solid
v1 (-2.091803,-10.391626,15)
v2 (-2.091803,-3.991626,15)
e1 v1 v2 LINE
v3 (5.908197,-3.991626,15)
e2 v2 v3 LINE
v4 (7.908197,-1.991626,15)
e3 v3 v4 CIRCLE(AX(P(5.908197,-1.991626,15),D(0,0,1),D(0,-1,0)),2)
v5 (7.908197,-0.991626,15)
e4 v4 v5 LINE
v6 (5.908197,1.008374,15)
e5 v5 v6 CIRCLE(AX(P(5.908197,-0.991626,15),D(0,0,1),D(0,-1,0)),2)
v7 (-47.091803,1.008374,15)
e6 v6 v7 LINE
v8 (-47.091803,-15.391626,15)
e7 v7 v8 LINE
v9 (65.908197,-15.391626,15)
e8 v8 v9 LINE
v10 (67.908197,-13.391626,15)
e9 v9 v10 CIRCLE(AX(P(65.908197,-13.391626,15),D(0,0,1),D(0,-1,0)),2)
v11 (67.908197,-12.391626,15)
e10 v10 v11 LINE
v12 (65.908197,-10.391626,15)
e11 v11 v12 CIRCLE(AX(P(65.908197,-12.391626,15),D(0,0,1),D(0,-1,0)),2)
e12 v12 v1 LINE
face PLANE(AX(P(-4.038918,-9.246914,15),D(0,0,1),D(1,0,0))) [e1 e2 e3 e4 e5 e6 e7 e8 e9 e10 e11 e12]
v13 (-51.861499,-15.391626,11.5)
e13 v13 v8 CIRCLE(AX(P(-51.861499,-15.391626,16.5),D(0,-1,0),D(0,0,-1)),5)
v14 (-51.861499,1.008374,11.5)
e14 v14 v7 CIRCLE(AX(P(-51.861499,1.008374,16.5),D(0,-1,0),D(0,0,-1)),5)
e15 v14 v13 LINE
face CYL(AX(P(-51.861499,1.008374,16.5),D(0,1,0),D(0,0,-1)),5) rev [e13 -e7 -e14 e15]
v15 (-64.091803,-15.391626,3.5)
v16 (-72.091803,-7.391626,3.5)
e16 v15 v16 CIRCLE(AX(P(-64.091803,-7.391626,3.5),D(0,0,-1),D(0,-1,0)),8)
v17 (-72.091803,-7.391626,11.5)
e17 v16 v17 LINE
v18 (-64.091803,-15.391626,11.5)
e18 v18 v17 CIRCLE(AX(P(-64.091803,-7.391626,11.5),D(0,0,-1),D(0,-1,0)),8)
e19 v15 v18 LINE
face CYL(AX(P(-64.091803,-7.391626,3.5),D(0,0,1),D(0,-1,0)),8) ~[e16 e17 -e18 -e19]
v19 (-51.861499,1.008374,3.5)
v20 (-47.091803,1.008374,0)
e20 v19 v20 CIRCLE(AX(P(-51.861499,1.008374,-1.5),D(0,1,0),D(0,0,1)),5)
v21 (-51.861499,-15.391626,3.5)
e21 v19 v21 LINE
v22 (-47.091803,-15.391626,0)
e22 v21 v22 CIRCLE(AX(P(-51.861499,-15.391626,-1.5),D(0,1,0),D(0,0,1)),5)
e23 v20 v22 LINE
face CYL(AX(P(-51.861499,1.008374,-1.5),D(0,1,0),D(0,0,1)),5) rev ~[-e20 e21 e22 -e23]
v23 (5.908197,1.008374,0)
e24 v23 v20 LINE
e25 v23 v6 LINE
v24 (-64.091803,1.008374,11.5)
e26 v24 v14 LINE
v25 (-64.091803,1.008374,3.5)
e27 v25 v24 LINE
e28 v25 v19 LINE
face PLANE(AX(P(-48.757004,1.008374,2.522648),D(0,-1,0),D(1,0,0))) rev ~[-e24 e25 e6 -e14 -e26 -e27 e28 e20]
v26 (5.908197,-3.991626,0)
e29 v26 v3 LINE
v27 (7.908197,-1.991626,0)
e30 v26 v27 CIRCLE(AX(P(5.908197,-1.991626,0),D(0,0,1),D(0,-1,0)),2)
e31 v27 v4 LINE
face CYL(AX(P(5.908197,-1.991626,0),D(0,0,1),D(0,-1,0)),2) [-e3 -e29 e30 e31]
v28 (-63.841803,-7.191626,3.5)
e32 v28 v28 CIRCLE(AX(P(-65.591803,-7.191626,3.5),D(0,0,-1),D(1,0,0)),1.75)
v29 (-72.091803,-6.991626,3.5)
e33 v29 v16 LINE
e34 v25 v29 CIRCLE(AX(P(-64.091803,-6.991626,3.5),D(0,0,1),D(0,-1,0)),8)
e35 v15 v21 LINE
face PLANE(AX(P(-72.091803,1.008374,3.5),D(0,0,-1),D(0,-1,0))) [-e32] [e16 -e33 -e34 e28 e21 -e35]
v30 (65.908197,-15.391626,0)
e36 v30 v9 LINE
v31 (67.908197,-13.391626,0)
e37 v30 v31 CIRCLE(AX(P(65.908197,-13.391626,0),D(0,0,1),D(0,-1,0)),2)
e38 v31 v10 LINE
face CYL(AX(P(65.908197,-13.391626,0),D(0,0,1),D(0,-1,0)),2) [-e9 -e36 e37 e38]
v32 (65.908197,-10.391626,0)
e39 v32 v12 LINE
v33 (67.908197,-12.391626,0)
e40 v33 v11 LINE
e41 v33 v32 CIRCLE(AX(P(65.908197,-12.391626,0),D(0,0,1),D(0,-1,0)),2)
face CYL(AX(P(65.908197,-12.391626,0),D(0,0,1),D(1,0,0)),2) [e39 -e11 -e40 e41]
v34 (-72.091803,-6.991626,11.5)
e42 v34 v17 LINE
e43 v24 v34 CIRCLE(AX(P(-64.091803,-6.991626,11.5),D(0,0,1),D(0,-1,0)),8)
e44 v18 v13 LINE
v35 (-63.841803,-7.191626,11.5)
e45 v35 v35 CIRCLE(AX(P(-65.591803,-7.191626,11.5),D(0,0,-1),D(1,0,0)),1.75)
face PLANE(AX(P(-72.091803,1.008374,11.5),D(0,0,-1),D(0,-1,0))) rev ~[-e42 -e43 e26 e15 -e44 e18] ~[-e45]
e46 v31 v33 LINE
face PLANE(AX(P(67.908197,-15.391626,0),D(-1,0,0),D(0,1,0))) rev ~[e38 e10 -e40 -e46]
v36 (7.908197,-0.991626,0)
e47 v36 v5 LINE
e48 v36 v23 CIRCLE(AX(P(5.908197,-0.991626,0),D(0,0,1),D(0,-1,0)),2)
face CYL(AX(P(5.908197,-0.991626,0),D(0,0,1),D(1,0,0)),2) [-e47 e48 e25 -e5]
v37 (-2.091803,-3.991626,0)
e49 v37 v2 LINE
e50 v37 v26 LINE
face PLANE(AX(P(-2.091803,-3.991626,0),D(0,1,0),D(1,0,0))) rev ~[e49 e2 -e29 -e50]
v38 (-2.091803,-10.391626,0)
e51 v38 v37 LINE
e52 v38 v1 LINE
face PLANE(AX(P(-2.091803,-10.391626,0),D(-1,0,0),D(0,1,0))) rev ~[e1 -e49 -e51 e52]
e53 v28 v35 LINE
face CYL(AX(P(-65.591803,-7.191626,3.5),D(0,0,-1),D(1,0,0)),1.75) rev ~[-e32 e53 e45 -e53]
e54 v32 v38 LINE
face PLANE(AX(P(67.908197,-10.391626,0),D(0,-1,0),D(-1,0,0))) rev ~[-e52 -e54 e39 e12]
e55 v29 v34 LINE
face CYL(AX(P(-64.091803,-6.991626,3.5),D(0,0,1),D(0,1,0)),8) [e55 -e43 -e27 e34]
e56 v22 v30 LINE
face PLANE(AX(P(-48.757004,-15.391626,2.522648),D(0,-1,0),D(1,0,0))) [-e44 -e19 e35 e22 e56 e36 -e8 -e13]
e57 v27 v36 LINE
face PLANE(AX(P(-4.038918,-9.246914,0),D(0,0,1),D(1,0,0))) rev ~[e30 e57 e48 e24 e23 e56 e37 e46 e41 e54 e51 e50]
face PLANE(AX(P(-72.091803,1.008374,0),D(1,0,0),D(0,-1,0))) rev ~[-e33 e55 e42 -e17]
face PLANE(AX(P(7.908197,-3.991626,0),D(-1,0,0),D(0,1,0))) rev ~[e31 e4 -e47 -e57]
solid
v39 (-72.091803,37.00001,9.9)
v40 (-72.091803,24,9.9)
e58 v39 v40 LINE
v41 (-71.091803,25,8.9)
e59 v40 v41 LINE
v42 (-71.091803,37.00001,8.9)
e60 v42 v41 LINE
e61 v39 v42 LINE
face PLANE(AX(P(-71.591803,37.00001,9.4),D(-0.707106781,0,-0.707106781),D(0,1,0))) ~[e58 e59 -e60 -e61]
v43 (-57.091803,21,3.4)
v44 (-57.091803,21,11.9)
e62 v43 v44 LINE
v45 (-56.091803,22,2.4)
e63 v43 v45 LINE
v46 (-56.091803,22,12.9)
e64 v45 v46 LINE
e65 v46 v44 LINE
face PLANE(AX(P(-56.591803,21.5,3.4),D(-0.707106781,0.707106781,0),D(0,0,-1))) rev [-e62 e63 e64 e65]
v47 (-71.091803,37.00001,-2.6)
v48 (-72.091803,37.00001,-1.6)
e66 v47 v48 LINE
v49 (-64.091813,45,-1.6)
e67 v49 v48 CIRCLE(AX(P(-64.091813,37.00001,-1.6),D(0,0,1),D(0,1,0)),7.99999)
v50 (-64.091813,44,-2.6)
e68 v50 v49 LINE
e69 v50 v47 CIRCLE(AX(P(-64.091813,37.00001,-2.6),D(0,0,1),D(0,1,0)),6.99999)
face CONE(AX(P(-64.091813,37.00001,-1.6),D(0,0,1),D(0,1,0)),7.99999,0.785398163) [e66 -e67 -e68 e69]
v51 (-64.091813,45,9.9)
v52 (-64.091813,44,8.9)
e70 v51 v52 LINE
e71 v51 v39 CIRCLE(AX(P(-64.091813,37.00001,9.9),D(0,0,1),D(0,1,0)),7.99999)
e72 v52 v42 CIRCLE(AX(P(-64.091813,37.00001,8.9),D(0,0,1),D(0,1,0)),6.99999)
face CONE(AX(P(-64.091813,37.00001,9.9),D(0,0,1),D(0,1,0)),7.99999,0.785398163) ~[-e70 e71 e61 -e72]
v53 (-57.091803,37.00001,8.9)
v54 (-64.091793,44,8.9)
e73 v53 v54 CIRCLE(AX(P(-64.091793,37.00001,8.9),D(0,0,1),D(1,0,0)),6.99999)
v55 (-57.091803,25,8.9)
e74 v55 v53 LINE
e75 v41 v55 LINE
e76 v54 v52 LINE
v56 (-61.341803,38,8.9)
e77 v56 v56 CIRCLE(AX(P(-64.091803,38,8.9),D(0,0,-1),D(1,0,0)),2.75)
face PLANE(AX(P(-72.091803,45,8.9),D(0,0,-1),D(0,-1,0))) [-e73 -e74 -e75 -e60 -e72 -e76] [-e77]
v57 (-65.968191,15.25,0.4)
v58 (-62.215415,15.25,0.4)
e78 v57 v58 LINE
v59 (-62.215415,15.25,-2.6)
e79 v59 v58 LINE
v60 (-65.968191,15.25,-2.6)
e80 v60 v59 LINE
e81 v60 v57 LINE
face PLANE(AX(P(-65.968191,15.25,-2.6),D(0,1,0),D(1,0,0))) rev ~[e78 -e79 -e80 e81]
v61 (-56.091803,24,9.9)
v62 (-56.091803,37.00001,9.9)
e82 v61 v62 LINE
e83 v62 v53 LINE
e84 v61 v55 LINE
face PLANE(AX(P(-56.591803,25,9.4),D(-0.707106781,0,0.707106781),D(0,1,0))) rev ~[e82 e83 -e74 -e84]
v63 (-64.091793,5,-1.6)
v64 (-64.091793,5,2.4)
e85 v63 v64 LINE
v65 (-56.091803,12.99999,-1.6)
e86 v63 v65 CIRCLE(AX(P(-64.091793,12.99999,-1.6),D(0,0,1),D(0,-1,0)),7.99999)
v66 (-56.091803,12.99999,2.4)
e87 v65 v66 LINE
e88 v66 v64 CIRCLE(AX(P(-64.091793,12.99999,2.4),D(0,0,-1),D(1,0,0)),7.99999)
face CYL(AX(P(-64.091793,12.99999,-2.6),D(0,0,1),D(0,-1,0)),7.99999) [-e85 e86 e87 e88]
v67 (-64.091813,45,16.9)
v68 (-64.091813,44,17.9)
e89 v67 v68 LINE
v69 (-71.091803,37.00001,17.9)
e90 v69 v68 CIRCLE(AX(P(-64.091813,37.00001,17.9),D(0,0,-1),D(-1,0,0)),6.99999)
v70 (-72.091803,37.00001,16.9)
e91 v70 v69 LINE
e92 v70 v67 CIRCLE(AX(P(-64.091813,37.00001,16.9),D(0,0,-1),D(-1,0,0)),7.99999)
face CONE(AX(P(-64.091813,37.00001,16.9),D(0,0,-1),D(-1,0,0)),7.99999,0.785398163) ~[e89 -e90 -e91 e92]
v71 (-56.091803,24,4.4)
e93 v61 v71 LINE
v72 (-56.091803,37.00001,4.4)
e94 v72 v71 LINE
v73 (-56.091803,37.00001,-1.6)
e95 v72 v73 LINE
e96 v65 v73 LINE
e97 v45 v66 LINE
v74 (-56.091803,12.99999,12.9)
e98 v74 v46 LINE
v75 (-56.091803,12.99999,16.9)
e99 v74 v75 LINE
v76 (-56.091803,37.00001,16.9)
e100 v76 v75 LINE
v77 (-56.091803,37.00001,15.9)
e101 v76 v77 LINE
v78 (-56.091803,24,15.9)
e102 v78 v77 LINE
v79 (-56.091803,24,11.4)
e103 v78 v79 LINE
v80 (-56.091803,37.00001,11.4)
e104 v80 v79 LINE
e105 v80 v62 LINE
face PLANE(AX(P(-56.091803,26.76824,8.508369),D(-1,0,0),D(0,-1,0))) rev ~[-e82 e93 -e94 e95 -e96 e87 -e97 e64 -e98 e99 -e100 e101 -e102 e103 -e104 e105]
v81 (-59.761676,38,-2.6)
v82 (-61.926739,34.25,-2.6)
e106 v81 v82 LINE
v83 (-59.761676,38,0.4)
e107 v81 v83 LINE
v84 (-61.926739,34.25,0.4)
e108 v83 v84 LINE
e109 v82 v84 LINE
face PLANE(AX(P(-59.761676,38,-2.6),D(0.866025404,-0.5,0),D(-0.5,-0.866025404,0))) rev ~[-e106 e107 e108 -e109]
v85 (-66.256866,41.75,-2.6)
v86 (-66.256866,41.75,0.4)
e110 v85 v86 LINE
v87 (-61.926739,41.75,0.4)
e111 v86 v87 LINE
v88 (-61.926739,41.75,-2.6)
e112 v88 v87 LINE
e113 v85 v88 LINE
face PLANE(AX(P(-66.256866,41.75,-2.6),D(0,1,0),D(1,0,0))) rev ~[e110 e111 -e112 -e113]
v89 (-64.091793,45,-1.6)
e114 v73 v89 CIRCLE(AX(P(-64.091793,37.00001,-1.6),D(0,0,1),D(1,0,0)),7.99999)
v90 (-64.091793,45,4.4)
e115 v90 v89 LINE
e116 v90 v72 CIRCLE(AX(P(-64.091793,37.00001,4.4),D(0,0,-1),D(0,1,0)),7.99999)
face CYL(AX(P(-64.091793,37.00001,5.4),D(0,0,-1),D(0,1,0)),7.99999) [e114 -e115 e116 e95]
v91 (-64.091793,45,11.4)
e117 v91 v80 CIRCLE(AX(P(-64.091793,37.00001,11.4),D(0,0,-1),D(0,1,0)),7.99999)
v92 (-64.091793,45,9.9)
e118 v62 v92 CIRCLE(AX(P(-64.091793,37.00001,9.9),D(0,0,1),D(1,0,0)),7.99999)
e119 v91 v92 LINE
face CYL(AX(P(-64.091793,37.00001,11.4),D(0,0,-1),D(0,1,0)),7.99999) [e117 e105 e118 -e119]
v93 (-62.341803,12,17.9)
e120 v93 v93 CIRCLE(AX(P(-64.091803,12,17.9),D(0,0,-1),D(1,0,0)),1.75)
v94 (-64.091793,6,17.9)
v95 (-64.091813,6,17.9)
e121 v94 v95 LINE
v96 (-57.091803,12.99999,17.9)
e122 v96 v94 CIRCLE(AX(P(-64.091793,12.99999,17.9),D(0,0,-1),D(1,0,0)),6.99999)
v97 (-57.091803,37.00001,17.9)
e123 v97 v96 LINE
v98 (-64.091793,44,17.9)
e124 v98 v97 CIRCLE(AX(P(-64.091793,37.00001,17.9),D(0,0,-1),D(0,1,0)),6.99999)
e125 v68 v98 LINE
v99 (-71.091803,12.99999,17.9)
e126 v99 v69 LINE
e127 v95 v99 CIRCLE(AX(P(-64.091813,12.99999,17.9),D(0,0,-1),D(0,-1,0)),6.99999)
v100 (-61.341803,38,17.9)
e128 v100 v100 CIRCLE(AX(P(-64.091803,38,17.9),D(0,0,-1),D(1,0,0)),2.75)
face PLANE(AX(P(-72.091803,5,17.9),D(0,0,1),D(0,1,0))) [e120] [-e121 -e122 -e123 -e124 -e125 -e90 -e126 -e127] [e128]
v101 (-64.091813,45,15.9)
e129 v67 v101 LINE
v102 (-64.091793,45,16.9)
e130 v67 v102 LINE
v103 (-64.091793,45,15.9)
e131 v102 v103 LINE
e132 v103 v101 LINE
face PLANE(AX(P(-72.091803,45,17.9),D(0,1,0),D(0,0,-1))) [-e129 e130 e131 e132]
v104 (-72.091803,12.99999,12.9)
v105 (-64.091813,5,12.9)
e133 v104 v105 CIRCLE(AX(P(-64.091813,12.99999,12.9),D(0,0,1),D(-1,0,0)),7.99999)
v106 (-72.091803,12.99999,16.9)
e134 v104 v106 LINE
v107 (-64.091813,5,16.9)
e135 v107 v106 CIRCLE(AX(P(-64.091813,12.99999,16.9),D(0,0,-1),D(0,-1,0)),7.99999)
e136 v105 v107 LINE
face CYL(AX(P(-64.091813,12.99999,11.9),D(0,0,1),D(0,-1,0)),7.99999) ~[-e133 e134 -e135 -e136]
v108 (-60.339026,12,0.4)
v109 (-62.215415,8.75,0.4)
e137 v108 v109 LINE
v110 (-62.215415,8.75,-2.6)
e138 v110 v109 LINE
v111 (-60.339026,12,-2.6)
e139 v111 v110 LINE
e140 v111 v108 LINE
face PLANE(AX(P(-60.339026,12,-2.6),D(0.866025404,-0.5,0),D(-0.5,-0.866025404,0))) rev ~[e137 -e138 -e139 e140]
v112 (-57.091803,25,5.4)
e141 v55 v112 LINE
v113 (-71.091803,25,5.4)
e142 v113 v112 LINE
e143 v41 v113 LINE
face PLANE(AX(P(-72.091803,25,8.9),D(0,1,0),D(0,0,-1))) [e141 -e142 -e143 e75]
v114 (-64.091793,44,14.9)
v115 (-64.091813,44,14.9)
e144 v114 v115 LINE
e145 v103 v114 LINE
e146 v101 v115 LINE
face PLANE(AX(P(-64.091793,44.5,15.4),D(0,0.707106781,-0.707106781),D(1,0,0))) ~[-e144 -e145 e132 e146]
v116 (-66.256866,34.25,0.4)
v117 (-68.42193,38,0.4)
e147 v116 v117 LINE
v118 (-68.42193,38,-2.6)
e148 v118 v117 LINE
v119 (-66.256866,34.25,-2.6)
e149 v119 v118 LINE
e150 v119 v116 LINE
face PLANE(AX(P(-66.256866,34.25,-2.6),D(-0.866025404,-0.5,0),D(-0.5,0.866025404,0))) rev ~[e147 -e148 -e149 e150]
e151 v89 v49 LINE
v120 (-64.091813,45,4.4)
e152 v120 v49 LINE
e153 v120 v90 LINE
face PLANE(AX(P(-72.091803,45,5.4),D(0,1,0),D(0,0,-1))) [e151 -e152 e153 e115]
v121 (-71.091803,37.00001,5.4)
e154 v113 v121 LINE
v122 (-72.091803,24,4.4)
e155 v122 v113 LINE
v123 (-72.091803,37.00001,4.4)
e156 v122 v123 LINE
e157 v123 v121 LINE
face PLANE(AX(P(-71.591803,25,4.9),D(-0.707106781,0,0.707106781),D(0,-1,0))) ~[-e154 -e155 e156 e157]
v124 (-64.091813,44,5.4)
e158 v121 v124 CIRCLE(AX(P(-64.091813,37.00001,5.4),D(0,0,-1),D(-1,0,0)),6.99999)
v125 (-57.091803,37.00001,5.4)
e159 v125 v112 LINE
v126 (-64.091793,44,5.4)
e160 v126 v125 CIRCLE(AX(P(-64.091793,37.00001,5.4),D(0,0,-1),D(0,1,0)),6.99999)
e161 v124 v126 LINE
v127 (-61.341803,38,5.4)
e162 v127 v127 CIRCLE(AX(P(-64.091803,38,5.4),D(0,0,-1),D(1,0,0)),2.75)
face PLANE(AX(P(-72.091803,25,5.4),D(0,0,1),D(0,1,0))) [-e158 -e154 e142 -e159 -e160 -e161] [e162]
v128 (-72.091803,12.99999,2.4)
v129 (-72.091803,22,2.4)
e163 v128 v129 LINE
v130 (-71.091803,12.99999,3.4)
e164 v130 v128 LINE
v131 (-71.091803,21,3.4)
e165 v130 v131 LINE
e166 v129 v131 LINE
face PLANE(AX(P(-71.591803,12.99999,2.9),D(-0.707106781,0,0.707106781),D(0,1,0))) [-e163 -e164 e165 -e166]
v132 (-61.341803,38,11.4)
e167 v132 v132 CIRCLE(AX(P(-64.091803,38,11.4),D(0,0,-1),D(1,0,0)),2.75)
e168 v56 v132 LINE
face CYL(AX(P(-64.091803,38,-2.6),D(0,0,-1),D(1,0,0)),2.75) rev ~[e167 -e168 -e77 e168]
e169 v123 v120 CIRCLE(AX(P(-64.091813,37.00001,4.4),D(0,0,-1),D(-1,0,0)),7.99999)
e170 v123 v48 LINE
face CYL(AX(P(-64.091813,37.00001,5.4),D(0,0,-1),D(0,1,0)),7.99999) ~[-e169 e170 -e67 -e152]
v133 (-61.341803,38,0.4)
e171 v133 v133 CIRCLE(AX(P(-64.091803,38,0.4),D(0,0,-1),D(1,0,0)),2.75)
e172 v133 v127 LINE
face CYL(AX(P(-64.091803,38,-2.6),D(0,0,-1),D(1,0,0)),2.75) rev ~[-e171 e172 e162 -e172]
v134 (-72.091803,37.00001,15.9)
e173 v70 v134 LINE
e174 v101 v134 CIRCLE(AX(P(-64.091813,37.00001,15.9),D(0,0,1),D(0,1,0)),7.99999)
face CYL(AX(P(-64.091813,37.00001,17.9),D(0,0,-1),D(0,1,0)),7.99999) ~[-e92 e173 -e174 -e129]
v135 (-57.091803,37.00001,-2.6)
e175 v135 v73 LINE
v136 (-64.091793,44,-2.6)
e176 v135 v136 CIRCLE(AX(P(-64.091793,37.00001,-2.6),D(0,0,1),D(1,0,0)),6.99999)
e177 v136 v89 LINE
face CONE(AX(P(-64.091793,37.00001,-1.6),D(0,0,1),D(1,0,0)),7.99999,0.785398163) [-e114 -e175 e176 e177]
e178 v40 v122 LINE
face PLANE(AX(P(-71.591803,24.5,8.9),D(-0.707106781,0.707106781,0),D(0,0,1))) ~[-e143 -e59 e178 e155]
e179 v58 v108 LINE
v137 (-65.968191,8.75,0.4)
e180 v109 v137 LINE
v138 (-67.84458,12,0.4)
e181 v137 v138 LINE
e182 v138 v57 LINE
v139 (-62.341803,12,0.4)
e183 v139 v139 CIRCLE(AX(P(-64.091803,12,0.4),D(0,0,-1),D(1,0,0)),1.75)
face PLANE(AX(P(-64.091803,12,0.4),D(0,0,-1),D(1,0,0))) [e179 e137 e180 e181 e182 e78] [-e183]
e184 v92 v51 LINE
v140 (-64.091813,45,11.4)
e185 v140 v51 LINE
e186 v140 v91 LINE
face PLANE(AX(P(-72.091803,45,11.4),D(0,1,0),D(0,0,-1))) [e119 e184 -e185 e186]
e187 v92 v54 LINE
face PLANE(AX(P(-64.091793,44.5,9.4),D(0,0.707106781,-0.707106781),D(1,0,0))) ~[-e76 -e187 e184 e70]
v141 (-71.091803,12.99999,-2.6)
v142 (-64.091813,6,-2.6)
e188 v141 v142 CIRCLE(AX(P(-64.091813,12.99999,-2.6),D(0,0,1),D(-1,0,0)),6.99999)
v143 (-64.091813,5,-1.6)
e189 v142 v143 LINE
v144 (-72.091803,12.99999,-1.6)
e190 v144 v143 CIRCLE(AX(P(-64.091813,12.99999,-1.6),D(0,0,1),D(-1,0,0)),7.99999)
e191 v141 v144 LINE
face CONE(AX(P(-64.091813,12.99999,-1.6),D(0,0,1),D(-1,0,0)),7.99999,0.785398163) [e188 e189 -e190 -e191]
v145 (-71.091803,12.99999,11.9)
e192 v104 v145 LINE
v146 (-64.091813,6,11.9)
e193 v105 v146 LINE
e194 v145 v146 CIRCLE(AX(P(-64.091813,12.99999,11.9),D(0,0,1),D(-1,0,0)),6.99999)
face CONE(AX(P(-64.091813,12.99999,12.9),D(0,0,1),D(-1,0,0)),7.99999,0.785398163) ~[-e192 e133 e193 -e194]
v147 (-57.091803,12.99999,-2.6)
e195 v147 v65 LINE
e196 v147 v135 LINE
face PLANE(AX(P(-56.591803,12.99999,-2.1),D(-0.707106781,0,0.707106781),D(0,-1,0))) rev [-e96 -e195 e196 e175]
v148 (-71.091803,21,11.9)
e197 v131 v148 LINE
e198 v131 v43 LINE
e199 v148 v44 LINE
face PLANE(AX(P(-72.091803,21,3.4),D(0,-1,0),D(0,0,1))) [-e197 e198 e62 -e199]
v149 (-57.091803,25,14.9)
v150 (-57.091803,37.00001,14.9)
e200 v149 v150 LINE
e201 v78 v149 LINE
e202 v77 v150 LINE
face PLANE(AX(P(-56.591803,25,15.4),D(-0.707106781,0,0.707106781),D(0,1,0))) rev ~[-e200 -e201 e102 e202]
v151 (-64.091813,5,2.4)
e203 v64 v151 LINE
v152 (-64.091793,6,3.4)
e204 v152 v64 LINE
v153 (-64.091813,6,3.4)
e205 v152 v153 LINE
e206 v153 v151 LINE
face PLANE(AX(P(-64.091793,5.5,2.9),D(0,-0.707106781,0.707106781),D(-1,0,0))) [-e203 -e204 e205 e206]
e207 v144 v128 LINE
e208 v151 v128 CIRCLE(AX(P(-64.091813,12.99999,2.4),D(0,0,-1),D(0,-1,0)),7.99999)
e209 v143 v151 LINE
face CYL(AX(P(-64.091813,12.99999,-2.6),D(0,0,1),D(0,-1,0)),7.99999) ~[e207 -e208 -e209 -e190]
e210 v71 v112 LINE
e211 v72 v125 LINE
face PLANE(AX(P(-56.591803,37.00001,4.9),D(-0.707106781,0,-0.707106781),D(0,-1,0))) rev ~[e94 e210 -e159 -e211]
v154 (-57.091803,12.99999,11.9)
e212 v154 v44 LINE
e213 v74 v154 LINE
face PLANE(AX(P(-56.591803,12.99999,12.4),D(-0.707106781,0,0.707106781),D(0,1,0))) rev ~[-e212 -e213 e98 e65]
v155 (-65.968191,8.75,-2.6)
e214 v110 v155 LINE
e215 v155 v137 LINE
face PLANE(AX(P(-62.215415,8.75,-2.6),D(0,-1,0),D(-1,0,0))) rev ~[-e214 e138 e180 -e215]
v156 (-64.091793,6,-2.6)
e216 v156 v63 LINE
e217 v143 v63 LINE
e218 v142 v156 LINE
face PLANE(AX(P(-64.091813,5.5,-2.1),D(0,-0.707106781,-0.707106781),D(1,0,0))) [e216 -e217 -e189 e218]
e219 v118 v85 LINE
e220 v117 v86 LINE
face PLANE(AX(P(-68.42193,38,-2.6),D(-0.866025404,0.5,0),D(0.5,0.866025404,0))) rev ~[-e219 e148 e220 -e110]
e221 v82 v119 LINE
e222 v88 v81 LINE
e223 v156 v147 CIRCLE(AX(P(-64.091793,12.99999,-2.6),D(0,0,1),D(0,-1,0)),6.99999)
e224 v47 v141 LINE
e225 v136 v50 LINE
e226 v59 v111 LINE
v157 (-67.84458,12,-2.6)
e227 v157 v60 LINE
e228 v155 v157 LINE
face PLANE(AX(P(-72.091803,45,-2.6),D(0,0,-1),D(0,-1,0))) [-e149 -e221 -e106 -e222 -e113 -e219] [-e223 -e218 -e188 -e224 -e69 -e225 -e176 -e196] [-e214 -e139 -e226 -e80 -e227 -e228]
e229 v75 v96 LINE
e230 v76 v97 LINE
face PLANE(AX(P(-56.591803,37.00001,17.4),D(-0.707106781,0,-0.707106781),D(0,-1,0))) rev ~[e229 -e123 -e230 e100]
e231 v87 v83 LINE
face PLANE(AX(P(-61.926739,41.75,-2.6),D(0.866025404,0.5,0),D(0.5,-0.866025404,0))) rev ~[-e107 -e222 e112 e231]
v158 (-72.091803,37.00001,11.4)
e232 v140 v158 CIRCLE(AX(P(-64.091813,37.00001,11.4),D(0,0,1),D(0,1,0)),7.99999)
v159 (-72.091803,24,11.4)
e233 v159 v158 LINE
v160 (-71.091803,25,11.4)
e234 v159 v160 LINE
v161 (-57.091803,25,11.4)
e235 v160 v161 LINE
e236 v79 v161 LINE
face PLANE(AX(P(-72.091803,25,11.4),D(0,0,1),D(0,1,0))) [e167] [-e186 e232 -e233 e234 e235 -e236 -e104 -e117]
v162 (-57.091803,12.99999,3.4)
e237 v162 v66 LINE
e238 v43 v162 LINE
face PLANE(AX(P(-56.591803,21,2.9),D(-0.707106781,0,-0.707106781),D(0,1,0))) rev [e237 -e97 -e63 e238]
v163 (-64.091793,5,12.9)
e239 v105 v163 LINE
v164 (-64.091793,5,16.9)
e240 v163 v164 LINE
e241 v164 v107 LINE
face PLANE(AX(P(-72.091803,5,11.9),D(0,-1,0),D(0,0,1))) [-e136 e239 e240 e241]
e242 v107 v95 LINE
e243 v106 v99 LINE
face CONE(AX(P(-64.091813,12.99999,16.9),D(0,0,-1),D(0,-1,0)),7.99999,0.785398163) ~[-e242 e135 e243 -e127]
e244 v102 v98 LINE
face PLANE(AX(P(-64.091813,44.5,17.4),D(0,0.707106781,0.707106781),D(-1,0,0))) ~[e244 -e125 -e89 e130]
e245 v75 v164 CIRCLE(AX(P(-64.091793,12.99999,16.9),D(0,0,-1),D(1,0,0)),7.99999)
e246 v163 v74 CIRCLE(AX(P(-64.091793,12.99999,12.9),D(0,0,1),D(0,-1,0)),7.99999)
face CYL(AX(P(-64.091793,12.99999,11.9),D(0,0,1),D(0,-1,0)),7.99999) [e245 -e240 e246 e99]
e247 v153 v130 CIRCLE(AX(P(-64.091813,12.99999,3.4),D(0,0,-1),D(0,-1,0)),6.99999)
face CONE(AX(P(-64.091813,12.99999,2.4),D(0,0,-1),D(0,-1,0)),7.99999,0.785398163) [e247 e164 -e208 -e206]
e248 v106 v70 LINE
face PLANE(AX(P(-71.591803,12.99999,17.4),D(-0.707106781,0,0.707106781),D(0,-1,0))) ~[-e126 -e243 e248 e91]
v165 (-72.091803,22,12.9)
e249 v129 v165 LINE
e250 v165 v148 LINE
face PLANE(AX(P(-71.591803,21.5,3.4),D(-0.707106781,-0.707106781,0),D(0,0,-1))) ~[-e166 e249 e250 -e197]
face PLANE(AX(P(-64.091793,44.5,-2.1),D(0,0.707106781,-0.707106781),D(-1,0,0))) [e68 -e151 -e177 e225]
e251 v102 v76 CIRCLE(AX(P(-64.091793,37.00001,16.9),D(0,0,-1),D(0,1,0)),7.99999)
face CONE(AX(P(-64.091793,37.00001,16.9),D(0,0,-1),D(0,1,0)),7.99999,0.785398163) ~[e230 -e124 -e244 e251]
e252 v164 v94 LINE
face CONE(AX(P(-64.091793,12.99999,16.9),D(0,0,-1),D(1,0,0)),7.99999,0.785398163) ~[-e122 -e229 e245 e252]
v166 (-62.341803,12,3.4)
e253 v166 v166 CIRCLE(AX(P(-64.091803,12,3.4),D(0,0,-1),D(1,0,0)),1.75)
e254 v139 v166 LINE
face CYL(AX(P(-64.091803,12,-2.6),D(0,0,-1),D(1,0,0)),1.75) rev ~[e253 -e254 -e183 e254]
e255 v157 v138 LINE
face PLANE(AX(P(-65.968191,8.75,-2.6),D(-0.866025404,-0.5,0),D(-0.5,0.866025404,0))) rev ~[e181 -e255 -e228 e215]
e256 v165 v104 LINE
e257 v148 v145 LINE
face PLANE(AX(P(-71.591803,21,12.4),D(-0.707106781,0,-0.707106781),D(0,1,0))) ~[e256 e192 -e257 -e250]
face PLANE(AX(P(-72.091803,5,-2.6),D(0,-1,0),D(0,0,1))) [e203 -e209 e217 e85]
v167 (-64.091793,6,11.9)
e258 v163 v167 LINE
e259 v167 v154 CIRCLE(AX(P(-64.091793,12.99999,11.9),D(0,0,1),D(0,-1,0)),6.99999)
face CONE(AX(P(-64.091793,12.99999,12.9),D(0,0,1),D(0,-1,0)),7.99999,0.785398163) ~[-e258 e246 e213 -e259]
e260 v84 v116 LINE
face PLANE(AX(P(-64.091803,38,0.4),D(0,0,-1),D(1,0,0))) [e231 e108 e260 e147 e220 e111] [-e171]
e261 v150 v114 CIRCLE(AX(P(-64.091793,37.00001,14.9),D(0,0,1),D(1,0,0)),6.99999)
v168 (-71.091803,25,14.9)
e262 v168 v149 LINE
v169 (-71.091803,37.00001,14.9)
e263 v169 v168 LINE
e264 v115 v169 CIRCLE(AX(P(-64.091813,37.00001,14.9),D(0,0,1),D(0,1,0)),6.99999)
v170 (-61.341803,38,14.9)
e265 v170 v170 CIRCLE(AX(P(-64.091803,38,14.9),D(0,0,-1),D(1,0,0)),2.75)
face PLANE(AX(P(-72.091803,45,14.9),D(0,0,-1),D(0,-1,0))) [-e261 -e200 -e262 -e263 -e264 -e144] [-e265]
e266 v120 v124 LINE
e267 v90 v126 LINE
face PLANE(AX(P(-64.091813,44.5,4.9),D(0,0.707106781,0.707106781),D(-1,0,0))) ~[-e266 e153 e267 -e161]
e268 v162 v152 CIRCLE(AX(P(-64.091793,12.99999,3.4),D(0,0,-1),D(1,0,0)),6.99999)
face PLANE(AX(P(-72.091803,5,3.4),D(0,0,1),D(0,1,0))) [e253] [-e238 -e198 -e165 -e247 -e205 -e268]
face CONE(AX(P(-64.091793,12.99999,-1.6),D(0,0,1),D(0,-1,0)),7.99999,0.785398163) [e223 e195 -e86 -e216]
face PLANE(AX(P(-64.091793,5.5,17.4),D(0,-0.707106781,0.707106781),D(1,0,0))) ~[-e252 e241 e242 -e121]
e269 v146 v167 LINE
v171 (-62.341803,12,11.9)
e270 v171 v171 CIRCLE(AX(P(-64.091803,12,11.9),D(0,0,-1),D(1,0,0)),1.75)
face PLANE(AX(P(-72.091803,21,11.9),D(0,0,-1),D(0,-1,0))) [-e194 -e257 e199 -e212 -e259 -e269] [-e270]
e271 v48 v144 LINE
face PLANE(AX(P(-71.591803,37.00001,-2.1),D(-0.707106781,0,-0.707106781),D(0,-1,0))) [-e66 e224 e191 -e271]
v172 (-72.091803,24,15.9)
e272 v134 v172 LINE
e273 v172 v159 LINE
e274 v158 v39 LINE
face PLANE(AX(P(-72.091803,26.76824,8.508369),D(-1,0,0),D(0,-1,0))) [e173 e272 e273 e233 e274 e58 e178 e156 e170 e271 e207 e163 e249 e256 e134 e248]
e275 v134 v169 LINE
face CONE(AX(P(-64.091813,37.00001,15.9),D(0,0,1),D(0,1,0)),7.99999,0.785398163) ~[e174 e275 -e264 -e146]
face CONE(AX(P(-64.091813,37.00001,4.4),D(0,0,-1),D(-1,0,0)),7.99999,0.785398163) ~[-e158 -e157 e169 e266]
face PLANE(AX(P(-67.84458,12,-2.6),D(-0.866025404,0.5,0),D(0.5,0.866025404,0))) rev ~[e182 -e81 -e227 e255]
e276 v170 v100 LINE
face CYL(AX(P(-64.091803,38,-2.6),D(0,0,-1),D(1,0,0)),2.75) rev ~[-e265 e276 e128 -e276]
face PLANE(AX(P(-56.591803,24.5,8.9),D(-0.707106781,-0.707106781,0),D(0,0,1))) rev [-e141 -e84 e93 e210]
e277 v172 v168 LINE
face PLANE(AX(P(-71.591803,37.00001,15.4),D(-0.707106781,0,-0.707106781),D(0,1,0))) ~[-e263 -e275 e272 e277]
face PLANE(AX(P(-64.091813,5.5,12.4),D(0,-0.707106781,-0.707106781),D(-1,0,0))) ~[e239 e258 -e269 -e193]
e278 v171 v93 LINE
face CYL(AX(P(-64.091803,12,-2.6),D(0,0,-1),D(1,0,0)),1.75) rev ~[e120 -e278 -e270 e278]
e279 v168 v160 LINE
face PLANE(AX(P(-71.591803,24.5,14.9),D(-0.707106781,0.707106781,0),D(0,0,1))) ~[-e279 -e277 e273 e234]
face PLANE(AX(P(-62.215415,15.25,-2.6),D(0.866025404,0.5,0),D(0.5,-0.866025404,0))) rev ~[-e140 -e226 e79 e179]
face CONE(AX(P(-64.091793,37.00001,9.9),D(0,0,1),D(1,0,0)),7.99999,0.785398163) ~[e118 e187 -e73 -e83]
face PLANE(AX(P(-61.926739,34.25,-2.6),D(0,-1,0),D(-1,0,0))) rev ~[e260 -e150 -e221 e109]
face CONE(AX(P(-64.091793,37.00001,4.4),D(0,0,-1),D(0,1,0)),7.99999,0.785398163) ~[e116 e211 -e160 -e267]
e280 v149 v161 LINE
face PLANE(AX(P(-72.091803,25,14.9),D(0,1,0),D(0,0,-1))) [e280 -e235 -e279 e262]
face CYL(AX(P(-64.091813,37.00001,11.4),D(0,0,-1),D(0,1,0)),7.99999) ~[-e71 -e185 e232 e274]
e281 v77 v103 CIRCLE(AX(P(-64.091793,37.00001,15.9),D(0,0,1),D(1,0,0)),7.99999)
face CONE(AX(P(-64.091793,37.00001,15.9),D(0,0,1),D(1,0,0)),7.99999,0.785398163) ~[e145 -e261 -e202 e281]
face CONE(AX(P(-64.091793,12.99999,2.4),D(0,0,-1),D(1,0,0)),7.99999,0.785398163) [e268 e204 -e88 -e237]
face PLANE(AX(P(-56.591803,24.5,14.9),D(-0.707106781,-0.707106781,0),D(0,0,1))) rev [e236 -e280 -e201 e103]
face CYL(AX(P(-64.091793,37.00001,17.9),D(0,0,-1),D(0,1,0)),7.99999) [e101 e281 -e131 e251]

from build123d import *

# Parameters (mm, degrees)
F1_DEPTH     = 15
F3_DEPTH     = 16
F5_R         = 7.99999
F4_R         = 2.75
F4_R_2       = 1.75
F6_DEPTH     = 25
F9_R         = 2
F10_W        = 16.4
F10_H        = 3.5
F11_DEPTH    = 25
F12_R        = 8
F13_R        = 1.75
F14_DEPTH    = 25
F15_T1_DEPTH = 16.4
F16_R        = 2.75
F16_R_2      = 1.75
F17_DEPTH    = 3
F18_SIZE     = 1


# Not quite as in the source:
# - a fillet or chamfer that OpenCascade refuses, or shapes differently, is made with other operations: its cross-section is extruded or revolved along the edge and cut away or added
# - a fillet or chamfer is up to 0.001 mm smaller than in the source, because OpenCascade refuses the exact size
# - a feature of the source that left no trace in its solid (it failed there, or was rolled back) is left out
# - a feature names something its author has since deleted; it is built from what else it names


with BuildPart() as f1:
    # F0 (on Top) → F1 (new body)
    with BuildSketch(Plane.XY):
        Polygon((-2.0918029547, -10.391625925), (-2.0918029547, -3.991625925), (7.9081970453, -3.991625925), (7.9081970453, 1.008374075), (-2.0918029547, 1.008374075), (-72.0918029547, 1.008374075), (-72.0918029547, -15.391625925), (-2.0918029547, -15.391625925), (67.9081970453, -15.391625925), (67.9081970453, -10.391625925), align=None)
    extrude(amount=F1_DEPTH)

    # F9
    f9_edges = [f1.edges().sort_by_distance(p)[0] for p in [
        (7.908197, 1.008374, 7.5),
        (67.908197, -10.391626, 7.5),
        (67.908197, -15.391626, 7.5),
        (7.908197, -3.991626, 7.5),
    ]]
    fillet(f9_edges, radius=F9_R)

    # F10 (on face) → F11 (cut)
    with BuildSketch(Plane(origin=(-72.0918029547, 0, 0), x_dir=(0, -1, 0), z_dir=(-1, 0, 0))):
        with Locations((7.191625925, 1.75)):
            Rectangle(F10_W, F10_H)
        with Locations((7.191625925, 13.25)):
            Rectangle(F10_W, F10_H)
    extrude(amount=-F11_DEPTH, mode=Mode.SUBTRACT)

    # F12
    f12_edges = [f1.edges().sort_by_distance(p)[0] for p in [
        (-72.091803, 1.008374, 7.5),
        (-72.091803, -15.391626, 7.5),
    ]]
    fillet(f12_edges, radius=F12_R)

    # F13 (on face) → F14 (cut)
    with BuildSketch(Plane(origin=(0, 0, 3.5), x_dir=(1, 0, 0), z_dir=(0, 0, -1))):
        with Locations((-65.5918029547, 7.191625925)):
            Circle(F13_R)
    extrude(amount=-F14_DEPTH, mode=Mode.SUBTRACT)

    # F15: fillet of radius 5 on 2 edges, made by hand

    # F15_s2 → F15_t1 (join)
    with BuildSketch(Plane.XZ.offset(-1.008374075)):
        with BuildLine():
            ThreePointArc((-51.8614989618, 3.5), (-48.9034590702, 2.5311288741), (-47.0918029547, 0))
            Line((-47.0918029547, 0), (-47.0918029547, 3.5))
            Line((-47.0918029547, 3.5), (-51.8614989618, 3.5))
        make_face()
        with BuildLine():
            ThreePointArc((-51.8614989618, 11.5), (-48.9034590702, 12.4688711259), (-47.0918029547, 15))
            Line((-47.0918029547, 15), (-47.0918029547, 11.5))
            Line((-47.0918029547, 11.5), (-51.8614989618, 11.5))
        make_face()
    extrude(amount=F15_T1_DEPTH)


with BuildPart() as f3:
    # F2 (on face) → F3 (new body)
    with BuildSketch(Plane(origin=(-72.0918029547, 0, 0), x_dir=(0, -1, 0), z_dir=(-1, 0, 0))):
        Polygon((-25.0802974196, -2.6), (-5, -2.6), (-5, 3.4), (-21, 3.4), (-21, 11.9), (-5, 11.9), (-5, 17.9), (-25, 17.9), (-45, 17.9), (-45, 14.9), (-25, 14.9), (-25, 11.4), (-45, 11.4), (-45, 8.9), (-25, 8.9), (-25, 5.4), (-45, 5.4), (-45, -2.6), align=None)
    extrude(amount=-F3_DEPTH)

    # F5 (radius 8 in the source; OpenCascade refuses exactly that, so slightly less here)
    f5_edges = [f3.edges().sort_by_distance(p)[0] for p in [
        (-56.091803, 45, 1.4),
        (-56.091803, 45, 10.15),
        (-56.091803, 45, 16.4),
        (-72.091803, 45, 1.4),
        (-72.091803, 45, 10.15),
        (-72.091803, 45, 16.4),
        (-72.091803, 5, 0.4),
        (-72.091803, 5, 14.9),
        (-56.091803, 5, 0.4),
        (-56.091803, 5, 14.9),
    ]]
    fillet(f5_edges, radius=F5_R)

    # F4 (on face) → F6 (cut)
    with BuildSketch(Plane(origin=(0, 0, -2.6), x_dir=(1, 0, 0), z_dir=(0, 0, -1))):
        with Locations((-64.0918029547, -38)):
            Circle(F4_R)
        with Locations((-64.0918029547, -12)):
            Circle(F4_R_2)
    extrude(amount=-F6_DEPTH, mode=Mode.SUBTRACT)

    # F16 (on face) → F17 (cut)
    with BuildSketch(Plane(origin=(0, 0, -2.6), x_dir=(1, 0, 0), z_dir=(0, 0, -1))):
        Polygon((-61.9267394452, -34.25), (-66.2568664641, -34.25), (-68.4219299736, -38), (-66.2568664641, -41.75), (-61.9267394452, -41.75), (-59.7616759358, -38), align=None)
        with Locations((-64.0918029547, -38)):
            Circle(F16_R, mode=Mode.SUBTRACT)
        Polygon((-62.2154145798, -8.75), (-65.9681913295, -8.75), (-67.8445797044, -12), (-65.9681913295, -15.25), (-62.2154145798, -15.25), (-60.3390262049, -12), align=None)
        with Locations((-64.0918029547, -12)):
            Circle(F16_R_2, mode=Mode.SUBTRACT)
    extrude(amount=-F17_DEPTH, mode=Mode.SUBTRACT)

    # F18
    f18_edges = [f3.edges().sort_by_distance(p)[0] for p in [
        (-72.091803, 25, 17.9),
        (-72.091803, 25, -2.6),
        (-72.091803, 31.000005, 5.4),
        (-72.091803, 31.000005, 8.9),
        (-72.091803, 31.000005, 14.9),
        (-72.091803, 16.999995, 11.9),
        (-72.091803, 21, 7.65),
        (-72.091803, 16.999995, 3.4),
        (-56.091803, 21, 7.65),
        (-56.091803, 25, 7.15),
        (-56.091803, 25, 13.15),
        (-72.091803, 25, 7.15),
        (-72.091803, 25, 13.15),
        (-64.091803, 45, -2.6),
        (-69.74866, 42.656857, -2.6),
        (-58.434946, 42.656857, -2.6),
        (-56.091803, 25, -2.6),
        (-69.74866, 7.343143, -2.6),
        (-58.434946, 7.343143, -2.6),
        (-64.091803, 5, -2.6),
        (-64.091803, 45, 5.4),
        (-69.74866, 42.656857, 5.4),
        (-58.434946, 42.656857, 5.4),
        (-56.091803, 31.000005, 5.4),
        (-56.091803, 16.999995, 3.4),
        (-56.091803, 31.000005, 8.9),
        (-56.091803, 16.999995, 11.9),
        (-56.091803, 25, 17.9),
        (-56.091803, 31.000005, 14.9),
        (-69.74866, 7.343143, 3.4),
        (-58.434946, 7.343143, 3.4),
        (-64.091803, 5, 3.4),
        (-64.091803, 45, 8.9),
        (-69.74866, 42.656857, 8.9),
        (-58.434946, 42.656857, 8.9),
        (-64.091803, 5, 11.9),
        (-69.74866, 7.343143, 11.9),
        (-58.434946, 7.343143, 11.9),
        (-69.74866, 7.343143, 17.9),
        (-64.091803, 5, 17.9),
        (-58.434946, 7.343143, 17.9),
        (-69.74866, 42.656857, 17.9),
        (-58.434946, 42.656857, 17.9),
        (-64.091803, 45, 17.9),
        (-69.74866, 42.656857, 14.9),
        (-64.091803, 45, 14.9),
        (-58.434946, 42.656857, 14.9),
    ]]
    chamfer(f18_edges, length=F18_SIZE)


solid = Compound([f1.part, f3.part])
